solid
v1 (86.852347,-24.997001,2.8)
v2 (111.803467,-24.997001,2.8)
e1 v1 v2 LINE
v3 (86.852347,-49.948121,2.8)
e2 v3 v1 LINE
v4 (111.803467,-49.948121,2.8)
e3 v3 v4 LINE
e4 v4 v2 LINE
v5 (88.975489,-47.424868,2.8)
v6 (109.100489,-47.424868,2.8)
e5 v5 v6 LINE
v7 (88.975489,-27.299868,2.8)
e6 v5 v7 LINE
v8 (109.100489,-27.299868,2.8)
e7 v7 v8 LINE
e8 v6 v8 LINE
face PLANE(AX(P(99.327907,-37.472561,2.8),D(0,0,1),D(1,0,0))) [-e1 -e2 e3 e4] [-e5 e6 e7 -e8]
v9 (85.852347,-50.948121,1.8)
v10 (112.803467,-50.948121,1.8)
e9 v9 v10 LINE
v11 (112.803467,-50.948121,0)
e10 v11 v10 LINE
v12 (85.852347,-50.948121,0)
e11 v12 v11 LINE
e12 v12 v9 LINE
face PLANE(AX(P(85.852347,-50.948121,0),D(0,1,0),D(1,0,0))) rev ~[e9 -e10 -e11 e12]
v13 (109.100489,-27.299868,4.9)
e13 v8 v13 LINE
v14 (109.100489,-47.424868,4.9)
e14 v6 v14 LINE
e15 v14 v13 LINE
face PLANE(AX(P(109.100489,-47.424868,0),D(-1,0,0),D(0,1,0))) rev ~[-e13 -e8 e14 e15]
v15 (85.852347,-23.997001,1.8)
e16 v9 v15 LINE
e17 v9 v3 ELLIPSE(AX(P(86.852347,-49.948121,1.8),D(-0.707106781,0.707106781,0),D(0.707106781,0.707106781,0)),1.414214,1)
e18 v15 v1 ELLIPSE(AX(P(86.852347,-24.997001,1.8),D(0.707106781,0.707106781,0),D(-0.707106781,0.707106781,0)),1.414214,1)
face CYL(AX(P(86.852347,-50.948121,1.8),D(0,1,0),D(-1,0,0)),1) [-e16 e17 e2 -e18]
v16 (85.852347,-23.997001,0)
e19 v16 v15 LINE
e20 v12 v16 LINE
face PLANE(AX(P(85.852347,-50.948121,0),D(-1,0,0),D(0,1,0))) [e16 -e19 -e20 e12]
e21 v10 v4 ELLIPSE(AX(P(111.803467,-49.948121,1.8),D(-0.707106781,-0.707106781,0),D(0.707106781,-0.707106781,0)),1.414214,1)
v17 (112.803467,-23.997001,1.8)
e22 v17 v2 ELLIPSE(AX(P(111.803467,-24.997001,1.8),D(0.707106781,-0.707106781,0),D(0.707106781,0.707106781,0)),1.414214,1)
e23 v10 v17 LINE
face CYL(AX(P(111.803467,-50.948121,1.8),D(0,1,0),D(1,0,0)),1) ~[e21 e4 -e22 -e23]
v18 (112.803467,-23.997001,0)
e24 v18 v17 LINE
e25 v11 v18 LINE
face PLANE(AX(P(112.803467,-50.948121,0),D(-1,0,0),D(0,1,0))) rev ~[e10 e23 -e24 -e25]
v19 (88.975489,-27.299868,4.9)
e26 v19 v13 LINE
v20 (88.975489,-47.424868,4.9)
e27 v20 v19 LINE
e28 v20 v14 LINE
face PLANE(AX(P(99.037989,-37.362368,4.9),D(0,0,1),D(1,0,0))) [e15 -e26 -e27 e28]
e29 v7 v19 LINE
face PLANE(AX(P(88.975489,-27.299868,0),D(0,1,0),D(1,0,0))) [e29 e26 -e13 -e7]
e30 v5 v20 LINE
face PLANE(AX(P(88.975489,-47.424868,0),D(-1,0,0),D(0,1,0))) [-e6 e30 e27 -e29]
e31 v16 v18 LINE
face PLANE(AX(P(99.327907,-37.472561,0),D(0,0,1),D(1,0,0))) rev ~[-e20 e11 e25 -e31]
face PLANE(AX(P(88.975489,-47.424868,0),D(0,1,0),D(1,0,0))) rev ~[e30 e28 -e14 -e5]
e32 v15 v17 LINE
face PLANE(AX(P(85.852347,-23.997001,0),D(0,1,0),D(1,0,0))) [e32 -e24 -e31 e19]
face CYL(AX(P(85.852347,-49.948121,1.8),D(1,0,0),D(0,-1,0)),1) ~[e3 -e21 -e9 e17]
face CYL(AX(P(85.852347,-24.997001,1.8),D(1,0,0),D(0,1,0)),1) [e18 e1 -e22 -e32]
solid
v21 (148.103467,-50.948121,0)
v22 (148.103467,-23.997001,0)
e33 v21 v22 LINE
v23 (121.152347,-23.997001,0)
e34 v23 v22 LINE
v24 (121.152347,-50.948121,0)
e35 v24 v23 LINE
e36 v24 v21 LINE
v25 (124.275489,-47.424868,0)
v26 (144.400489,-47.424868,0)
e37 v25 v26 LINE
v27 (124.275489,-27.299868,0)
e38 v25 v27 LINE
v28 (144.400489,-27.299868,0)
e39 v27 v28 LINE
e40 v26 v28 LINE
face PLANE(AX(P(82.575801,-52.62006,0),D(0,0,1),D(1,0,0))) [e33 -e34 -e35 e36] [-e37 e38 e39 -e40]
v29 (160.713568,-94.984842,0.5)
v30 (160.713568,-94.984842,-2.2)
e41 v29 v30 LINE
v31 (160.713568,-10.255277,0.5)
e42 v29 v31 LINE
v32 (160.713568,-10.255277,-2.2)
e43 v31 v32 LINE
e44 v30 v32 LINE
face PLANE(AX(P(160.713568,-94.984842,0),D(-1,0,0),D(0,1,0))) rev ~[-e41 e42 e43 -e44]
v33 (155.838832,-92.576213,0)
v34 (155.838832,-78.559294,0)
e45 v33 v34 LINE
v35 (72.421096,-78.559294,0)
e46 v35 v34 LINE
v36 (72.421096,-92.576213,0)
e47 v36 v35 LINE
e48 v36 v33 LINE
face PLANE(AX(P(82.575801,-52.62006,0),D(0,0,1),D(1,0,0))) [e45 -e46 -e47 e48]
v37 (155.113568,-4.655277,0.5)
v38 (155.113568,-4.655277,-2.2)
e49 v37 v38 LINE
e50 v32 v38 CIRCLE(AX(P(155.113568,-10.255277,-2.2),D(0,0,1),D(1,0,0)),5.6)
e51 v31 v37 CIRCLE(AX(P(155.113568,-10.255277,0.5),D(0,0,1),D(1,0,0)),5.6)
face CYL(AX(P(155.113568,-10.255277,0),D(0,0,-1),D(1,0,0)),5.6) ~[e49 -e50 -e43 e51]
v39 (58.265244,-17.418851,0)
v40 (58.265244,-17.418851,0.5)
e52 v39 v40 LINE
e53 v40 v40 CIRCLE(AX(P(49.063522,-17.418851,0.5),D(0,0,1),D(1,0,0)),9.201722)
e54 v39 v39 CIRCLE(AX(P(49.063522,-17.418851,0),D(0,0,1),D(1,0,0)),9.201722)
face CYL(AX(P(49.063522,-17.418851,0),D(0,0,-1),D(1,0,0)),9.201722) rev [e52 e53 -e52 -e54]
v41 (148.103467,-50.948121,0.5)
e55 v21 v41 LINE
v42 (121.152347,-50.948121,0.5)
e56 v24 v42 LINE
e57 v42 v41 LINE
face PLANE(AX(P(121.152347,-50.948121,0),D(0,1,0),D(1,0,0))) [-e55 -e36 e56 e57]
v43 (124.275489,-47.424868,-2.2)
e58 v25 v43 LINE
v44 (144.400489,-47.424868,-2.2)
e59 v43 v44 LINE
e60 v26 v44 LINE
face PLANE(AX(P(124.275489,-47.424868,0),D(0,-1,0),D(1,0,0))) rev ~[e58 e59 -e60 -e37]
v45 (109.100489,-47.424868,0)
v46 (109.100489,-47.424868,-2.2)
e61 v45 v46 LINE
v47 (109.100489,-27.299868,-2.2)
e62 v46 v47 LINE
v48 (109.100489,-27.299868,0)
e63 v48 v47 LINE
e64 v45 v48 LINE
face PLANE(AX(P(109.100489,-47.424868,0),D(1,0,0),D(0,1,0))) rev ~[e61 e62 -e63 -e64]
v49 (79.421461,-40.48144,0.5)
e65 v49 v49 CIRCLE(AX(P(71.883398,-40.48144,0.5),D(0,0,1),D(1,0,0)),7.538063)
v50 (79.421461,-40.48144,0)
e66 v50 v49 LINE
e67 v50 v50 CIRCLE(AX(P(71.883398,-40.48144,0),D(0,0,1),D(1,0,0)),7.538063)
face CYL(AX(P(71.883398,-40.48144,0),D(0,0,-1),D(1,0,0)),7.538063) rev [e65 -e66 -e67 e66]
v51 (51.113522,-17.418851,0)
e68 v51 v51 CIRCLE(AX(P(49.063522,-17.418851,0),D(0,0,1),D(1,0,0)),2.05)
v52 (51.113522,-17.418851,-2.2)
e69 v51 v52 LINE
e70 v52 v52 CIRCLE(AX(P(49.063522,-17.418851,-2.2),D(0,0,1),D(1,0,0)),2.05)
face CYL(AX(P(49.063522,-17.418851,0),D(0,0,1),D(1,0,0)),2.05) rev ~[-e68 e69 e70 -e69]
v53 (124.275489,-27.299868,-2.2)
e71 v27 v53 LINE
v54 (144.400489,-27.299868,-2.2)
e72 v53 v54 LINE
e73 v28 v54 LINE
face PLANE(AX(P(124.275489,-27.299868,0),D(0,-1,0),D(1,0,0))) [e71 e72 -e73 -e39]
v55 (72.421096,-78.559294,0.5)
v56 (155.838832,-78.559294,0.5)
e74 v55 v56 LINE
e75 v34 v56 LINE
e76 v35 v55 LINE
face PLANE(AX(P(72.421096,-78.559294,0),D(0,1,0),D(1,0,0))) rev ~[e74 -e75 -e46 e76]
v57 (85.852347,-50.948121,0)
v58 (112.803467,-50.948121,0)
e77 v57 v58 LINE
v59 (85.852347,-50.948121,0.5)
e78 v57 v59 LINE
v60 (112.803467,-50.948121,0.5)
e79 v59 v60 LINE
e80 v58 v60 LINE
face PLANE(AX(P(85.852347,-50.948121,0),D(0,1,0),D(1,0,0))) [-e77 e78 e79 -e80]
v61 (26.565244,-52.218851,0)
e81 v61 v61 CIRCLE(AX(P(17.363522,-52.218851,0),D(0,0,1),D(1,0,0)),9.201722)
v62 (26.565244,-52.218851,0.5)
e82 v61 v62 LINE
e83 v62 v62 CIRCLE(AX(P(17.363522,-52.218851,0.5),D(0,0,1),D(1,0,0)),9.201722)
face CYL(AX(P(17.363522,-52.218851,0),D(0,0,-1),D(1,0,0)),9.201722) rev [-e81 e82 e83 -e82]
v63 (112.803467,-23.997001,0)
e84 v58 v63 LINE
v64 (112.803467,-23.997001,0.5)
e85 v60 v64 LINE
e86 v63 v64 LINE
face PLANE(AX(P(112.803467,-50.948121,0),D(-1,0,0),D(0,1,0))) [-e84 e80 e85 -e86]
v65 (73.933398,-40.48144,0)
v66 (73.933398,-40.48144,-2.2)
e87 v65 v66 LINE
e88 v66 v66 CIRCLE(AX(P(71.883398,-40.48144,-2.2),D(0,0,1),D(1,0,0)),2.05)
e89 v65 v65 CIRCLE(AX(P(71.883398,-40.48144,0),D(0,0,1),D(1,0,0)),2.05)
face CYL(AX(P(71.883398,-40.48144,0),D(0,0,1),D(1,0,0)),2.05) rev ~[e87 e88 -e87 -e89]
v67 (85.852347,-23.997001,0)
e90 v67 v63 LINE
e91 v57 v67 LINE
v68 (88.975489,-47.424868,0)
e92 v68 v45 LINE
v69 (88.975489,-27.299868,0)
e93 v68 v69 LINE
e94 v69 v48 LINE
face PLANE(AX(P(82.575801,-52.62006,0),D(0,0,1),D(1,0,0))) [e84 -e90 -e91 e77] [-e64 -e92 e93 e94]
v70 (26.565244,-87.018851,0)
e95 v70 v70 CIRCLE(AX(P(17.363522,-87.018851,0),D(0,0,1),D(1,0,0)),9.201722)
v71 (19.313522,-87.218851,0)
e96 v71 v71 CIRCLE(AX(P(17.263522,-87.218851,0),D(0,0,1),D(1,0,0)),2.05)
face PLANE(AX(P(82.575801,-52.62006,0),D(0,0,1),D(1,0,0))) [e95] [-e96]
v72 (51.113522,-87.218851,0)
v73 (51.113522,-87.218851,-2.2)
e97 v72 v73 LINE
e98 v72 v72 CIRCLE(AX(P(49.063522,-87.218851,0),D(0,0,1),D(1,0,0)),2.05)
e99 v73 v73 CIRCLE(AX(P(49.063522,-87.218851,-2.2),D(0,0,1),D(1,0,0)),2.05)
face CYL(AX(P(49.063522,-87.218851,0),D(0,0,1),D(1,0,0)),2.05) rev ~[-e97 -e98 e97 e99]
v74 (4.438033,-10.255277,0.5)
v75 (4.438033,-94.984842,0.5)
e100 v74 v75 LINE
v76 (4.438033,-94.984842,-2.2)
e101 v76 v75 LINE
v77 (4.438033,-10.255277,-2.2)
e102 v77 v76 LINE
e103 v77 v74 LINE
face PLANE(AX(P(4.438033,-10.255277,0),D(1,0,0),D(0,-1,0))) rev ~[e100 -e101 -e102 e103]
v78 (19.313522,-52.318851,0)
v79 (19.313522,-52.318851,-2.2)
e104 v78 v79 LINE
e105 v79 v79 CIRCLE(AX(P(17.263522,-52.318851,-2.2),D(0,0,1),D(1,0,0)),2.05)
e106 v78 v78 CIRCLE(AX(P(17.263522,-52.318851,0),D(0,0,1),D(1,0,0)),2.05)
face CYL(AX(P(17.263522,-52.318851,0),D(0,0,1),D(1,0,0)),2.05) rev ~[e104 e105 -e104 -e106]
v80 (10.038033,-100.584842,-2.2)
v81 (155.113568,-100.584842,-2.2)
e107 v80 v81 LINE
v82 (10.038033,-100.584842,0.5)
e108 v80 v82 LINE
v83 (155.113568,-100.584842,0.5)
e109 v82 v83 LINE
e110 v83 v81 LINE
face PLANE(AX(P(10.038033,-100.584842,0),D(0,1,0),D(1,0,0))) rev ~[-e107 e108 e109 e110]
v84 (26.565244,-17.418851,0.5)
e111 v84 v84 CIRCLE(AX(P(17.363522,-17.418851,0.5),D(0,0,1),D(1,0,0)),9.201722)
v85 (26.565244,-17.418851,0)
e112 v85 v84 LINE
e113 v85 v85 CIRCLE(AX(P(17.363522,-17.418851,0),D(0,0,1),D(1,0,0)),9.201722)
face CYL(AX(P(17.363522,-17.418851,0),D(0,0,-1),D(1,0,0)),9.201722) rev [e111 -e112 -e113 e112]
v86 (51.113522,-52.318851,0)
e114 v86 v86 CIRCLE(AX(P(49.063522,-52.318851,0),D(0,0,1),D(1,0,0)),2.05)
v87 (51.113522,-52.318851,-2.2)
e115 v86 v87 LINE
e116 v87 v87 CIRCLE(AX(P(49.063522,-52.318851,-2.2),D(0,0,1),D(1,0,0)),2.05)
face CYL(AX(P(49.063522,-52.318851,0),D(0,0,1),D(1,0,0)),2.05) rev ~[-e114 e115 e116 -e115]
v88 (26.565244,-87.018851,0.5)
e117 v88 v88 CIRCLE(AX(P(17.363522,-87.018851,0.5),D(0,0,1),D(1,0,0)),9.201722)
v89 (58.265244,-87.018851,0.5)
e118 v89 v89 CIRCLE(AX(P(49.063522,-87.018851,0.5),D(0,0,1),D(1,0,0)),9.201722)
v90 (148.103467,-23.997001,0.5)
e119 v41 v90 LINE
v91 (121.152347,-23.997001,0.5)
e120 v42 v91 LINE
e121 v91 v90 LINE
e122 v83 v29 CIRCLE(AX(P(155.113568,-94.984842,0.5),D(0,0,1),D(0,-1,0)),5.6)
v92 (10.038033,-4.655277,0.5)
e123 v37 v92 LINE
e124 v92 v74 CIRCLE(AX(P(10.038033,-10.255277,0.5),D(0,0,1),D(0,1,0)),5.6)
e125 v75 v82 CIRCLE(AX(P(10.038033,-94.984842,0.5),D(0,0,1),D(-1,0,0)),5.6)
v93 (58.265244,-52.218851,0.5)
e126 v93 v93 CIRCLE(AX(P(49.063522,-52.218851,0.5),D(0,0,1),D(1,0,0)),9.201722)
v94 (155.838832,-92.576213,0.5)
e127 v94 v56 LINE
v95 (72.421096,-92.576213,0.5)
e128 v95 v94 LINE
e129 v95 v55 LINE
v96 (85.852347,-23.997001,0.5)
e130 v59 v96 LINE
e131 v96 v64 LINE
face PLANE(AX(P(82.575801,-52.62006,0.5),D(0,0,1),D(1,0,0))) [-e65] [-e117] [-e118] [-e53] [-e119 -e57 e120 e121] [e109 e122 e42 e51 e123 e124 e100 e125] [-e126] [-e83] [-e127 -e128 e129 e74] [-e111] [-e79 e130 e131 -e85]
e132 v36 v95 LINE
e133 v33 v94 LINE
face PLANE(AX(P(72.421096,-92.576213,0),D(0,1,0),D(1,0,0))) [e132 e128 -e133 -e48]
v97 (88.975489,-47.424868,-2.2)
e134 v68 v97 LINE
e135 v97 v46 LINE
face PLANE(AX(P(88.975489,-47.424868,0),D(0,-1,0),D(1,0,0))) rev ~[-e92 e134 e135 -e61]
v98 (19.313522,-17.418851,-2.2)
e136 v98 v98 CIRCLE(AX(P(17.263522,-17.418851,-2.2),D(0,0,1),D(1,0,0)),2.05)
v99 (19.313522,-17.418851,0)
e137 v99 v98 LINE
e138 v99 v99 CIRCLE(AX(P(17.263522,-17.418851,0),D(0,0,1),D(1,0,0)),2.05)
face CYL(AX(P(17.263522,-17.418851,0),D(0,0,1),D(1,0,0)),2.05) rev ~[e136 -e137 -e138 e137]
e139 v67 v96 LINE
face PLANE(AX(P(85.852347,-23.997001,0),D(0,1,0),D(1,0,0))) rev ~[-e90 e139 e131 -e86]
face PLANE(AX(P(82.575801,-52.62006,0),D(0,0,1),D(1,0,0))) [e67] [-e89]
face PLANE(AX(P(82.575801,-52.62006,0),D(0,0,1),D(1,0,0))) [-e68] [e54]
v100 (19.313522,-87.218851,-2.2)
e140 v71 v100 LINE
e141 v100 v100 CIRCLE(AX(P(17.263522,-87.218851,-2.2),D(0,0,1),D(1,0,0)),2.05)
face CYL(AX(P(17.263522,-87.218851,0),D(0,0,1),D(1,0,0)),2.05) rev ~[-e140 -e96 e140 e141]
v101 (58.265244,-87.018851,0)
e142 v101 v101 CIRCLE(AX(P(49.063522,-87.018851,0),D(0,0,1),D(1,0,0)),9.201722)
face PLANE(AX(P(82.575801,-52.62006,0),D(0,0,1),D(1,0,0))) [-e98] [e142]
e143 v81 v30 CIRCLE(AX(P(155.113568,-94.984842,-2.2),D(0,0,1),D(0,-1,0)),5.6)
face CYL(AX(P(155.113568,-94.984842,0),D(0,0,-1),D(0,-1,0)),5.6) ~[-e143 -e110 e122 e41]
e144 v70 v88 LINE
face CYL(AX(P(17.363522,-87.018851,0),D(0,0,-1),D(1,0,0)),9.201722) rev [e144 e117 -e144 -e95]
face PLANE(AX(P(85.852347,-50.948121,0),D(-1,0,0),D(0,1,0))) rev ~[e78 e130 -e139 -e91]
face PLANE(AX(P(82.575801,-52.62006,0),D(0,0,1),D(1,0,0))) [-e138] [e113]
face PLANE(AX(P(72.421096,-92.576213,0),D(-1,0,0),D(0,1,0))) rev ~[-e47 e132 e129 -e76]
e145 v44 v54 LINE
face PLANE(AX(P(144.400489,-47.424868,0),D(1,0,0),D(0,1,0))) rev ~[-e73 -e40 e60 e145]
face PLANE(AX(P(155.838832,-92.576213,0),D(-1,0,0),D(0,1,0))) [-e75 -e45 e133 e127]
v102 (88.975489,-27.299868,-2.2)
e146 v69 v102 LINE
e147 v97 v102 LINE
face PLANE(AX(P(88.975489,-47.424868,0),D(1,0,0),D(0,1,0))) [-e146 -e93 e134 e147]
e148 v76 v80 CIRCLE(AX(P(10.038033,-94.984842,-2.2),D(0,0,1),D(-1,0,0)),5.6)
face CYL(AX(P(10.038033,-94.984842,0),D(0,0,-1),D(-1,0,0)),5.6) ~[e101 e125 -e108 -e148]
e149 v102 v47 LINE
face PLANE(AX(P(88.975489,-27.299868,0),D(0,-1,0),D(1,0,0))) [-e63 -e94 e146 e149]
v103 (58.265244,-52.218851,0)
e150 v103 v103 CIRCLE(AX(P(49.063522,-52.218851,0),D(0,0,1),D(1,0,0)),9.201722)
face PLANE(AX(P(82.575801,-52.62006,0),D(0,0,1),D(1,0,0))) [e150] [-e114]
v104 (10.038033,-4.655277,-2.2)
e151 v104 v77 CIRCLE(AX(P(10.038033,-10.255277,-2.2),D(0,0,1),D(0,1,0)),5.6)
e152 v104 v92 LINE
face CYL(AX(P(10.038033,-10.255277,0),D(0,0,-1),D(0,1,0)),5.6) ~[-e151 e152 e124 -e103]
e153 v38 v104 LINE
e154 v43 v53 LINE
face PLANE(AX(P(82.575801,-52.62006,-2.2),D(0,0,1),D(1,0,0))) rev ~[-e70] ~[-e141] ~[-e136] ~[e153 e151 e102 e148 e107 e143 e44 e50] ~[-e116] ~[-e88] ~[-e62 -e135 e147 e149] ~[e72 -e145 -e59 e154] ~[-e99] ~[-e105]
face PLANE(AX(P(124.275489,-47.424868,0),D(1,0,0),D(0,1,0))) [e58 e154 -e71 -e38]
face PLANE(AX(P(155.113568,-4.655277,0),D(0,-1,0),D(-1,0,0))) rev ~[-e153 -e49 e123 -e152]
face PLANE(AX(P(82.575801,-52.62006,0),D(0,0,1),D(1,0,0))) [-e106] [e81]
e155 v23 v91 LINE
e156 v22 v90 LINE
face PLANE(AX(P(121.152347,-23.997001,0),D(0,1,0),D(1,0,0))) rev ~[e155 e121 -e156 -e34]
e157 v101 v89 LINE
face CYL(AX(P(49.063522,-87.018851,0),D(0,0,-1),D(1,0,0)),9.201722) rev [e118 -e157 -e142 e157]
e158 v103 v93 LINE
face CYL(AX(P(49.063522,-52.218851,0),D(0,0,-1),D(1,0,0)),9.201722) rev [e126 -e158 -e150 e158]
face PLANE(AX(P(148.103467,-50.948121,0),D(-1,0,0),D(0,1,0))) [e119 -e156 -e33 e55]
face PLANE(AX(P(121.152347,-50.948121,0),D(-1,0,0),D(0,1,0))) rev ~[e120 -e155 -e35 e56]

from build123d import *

# Parameters (mm, degrees)
F0_W     = 149.275535468
F0_H     = 88.9295647983
F0_R     = 9.2017219818
F0_W_2   = 83.4177359939
F0_H_2   = 14.016918838
F0_R_2   = 7.5380629756
F0_W_3   = 26.9511193037
F0_H_3   = 26.9511193037
F0_R_3   = 2.05
F0_W_4   = 20.125
F0_H_4   = 20.125
F1_DEPTH = 2.2
F2_DEPTH = 0.5
F3_DEPTH = 2.8
F4_R     = 1
F5_DEPTH = 4.9


with BuildPart() as f1:
    # F0 (on Top) → F1 (new body)
    with BuildSketch(Plane.XY):
        with BuildLine():
            Line((155.1135683298, -4.6552774664), (10.0380328618, -4.6552774664))
            ThreePointArc((10.0380328618, -4.6552774664), (6.0782348872, -6.2954794918), (4.4380328618, -10.2552774664))
            Line((4.4380328618, -10.2552774664), (4.4380328618, -94.9848422647))
            ThreePointArc((4.4380328618, -94.9848422647), (6.0782348872, -98.9446402393), (10.0380328618, -100.5848422647))
            Line((10.0380328618, -100.5848422647), (155.1135683298, -100.5848422647))
            ThreePointArc((155.1135683298, -100.5848422647), (159.0733663045, -98.9446402393), (160.7135683298, -94.9848422647))
            Line((160.7135683298, -94.9848422647), (160.7135683298, -10.2552774664))
            ThreePointArc((160.7135683298, -10.2552774664), (159.0733663045, -6.2954794918), (155.1135683298, -4.6552774664))
        make_face()
        with Locations((82.5758005958, -52.6200598655)):
            Rectangle(F0_W, F0_H, mode=Mode.SUBTRACT)
        with Locations((82.5758005958, -52.6200598655)):
            Rectangle(F0_W, F0_H)
        with Locations((17.3635222559, -87.018850666)):
            Circle(F0_R, mode=Mode.SUBTRACT)
        with Locations((49.0635222559, -87.018850666)):
            Circle(F0_R, mode=Mode.SUBTRACT)
        with Locations((114.1299642622, -85.567753762)):
            Rectangle(F0_W_2, F0_H_2, mode=Mode.SUBTRACT)
        with Locations((17.3635222559, -52.218850666)):
            Circle(F0_R, mode=Mode.SUBTRACT)
        with Locations((49.0635222559, -52.218850666)):
            Circle(F0_R, mode=Mode.SUBTRACT)
        with Locations((71.8833981295, -40.4814398784)):
            Circle(F0_R_2, mode=Mode.SUBTRACT)
        with Locations((17.3635222559, -17.418850666)):
            Circle(F0_R, mode=Mode.SUBTRACT)
        with Locations((49.0635222559, -17.418850666)):
            Circle(F0_R, mode=Mode.SUBTRACT)
        with Locations((99.3279069662, -37.4725610018)):
            Rectangle(F0_W_3, F0_H_3, mode=Mode.SUBTRACT)
        with Locations((134.6279069662, -37.4725610018)):
            Rectangle(F0_W_3, F0_H_3, mode=Mode.SUBTRACT)
        with Locations((17.3635222559, -17.418850666)):
            Circle(F0_R)
        with Locations((17.2635222559, -17.418850666)):
            Circle(F0_R_3, mode=Mode.SUBTRACT)
        with Locations((17.3635222559, -52.218850666)):
            Circle(F0_R)
        with Locations((17.2635222559, -52.318850666)):
            Circle(F0_R_3, mode=Mode.SUBTRACT)
        with Locations((17.3635222559, -87.018850666)):
            Circle(F0_R)
        with Locations((17.2635222559, -87.218850666)):
            Circle(F0_R_3, mode=Mode.SUBTRACT)
        with Locations((49.0635222559, -87.018850666)):
            Circle(F0_R)
        with Locations((49.0635222559, -87.218850666)):
            Circle(F0_R_3, mode=Mode.SUBTRACT)
        with Locations((49.0635222559, -52.218850666)):
            Circle(F0_R)
        with Locations((49.0635222559, -52.318850666)):
            Circle(F0_R_3, mode=Mode.SUBTRACT)
        with Locations((49.0635222559, -17.418850666)):
            Circle(F0_R)
        with Locations((49.0635222559, -17.418850666)):
            Circle(F0_R_3, mode=Mode.SUBTRACT)
        with Locations((71.8833981295, -40.4814398784)):
            Circle(F0_R_2)
        with Locations((71.8833981295, -40.4814398784)):
            Circle(F0_R_3, mode=Mode.SUBTRACT)
        with Locations((114.1299642622, -85.567753762)):
            Rectangle(F0_W_2, F0_H_2)
        with Locations((99.3279069662, -37.4725610018)):
            Rectangle(F0_W_3, F0_H_3)
        with Locations((99.0379891396, -37.3623677492)):
            Rectangle(F0_W_4, F0_H_4, mode=Mode.SUBTRACT)
        with Locations((134.6279069662, -37.4725610018)):
            Rectangle(F0_W_3, F0_H_3)
        with Locations((134.3379891396, -37.3623677492)):
            Rectangle(F0_W_4, F0_H_4, mode=Mode.SUBTRACT)
    extrude(amount=-F1_DEPTH)

    # F0 (on Top) → F2 (join)
    with BuildSketch(Plane.XY):
        with BuildLine():
            Line((155.1135683298, -4.6552774664), (10.0380328618, -4.6552774664))
            ThreePointArc((10.0380328618, -4.6552774664), (6.0782348872, -6.2954794918), (4.4380328618, -10.2552774664))
            Line((4.4380328618, -10.2552774664), (4.4380328618, -94.9848422647))
            ThreePointArc((4.4380328618, -94.9848422647), (6.0782348872, -98.9446402393), (10.0380328618, -100.5848422647))
            Line((10.0380328618, -100.5848422647), (155.1135683298, -100.5848422647))
            ThreePointArc((155.1135683298, -100.5848422647), (159.0733663045, -98.9446402393), (160.7135683298, -94.9848422647))
            Line((160.7135683298, -94.9848422647), (160.7135683298, -10.2552774664))
            ThreePointArc((160.7135683298, -10.2552774664), (159.0733663045, -6.2954794918), (155.1135683298, -4.6552774664))
        make_face()
        with Locations((82.5758005958, -52.6200598655)):
            Rectangle(F0_W, F0_H, mode=Mode.SUBTRACT)
        with Locations((82.5758005958, -52.6200598655)):
            Rectangle(F0_W, F0_H)
        with Locations((17.3635222559, -87.018850666)):
            Circle(F0_R, mode=Mode.SUBTRACT)
        with Locations((49.0635222559, -87.018850666)):
            Circle(F0_R, mode=Mode.SUBTRACT)
        with Locations((114.1299642622, -85.567753762)):
            Rectangle(F0_W_2, F0_H_2, mode=Mode.SUBTRACT)
        with Locations((17.3635222559, -52.218850666)):
            Circle(F0_R, mode=Mode.SUBTRACT)
        with Locations((49.0635222559, -52.218850666)):
            Circle(F0_R, mode=Mode.SUBTRACT)
        with Locations((71.8833981295, -40.4814398784)):
            Circle(F0_R_2, mode=Mode.SUBTRACT)
        with Locations((17.3635222559, -17.418850666)):
            Circle(F0_R, mode=Mode.SUBTRACT)
        with Locations((49.0635222559, -17.418850666)):
            Circle(F0_R, mode=Mode.SUBTRACT)
        with Locations((99.3279069662, -37.4725610018)):
            Rectangle(F0_W_3, F0_H_3, mode=Mode.SUBTRACT)
        with Locations((134.6279069662, -37.4725610018)):
            Rectangle(F0_W_3, F0_H_3, mode=Mode.SUBTRACT)
    extrude(amount=F2_DEPTH)


with BuildPart() as f3:
    # F0 (on Top) → F3 (new body)
    with BuildSketch(Plane.XY):
        with Locations((99.3279069662, -37.4725610018)):
            Rectangle(F0_W_3, F0_H_3)
        with Locations((99.0379891396, -37.3623677492)):
            Rectangle(F0_W_4, F0_H_4, mode=Mode.SUBTRACT)
    extrude(amount=F3_DEPTH)

    # F4
    f4_edges = [f3.edges().sort_by_distance(p)[0] for p in [
        (99.327907, -50.948121, 2.8),
        (85.852347, -37.472561, 2.8),
        (99.327907, -23.997001, 2.8),
        (112.803467, -37.472561, 2.8),
    ]]
    fillet(f4_edges, radius=F4_R)

    # F0 (on Top) → F5 (join)
    with BuildSketch(Plane.XY):
        with Locations((99.0379891396, -37.3623677492)):
            Rectangle(F0_W_4, F0_H_4)
    extrude(amount=F5_DEPTH)


solid = Compound([f1.part, f3.part])
